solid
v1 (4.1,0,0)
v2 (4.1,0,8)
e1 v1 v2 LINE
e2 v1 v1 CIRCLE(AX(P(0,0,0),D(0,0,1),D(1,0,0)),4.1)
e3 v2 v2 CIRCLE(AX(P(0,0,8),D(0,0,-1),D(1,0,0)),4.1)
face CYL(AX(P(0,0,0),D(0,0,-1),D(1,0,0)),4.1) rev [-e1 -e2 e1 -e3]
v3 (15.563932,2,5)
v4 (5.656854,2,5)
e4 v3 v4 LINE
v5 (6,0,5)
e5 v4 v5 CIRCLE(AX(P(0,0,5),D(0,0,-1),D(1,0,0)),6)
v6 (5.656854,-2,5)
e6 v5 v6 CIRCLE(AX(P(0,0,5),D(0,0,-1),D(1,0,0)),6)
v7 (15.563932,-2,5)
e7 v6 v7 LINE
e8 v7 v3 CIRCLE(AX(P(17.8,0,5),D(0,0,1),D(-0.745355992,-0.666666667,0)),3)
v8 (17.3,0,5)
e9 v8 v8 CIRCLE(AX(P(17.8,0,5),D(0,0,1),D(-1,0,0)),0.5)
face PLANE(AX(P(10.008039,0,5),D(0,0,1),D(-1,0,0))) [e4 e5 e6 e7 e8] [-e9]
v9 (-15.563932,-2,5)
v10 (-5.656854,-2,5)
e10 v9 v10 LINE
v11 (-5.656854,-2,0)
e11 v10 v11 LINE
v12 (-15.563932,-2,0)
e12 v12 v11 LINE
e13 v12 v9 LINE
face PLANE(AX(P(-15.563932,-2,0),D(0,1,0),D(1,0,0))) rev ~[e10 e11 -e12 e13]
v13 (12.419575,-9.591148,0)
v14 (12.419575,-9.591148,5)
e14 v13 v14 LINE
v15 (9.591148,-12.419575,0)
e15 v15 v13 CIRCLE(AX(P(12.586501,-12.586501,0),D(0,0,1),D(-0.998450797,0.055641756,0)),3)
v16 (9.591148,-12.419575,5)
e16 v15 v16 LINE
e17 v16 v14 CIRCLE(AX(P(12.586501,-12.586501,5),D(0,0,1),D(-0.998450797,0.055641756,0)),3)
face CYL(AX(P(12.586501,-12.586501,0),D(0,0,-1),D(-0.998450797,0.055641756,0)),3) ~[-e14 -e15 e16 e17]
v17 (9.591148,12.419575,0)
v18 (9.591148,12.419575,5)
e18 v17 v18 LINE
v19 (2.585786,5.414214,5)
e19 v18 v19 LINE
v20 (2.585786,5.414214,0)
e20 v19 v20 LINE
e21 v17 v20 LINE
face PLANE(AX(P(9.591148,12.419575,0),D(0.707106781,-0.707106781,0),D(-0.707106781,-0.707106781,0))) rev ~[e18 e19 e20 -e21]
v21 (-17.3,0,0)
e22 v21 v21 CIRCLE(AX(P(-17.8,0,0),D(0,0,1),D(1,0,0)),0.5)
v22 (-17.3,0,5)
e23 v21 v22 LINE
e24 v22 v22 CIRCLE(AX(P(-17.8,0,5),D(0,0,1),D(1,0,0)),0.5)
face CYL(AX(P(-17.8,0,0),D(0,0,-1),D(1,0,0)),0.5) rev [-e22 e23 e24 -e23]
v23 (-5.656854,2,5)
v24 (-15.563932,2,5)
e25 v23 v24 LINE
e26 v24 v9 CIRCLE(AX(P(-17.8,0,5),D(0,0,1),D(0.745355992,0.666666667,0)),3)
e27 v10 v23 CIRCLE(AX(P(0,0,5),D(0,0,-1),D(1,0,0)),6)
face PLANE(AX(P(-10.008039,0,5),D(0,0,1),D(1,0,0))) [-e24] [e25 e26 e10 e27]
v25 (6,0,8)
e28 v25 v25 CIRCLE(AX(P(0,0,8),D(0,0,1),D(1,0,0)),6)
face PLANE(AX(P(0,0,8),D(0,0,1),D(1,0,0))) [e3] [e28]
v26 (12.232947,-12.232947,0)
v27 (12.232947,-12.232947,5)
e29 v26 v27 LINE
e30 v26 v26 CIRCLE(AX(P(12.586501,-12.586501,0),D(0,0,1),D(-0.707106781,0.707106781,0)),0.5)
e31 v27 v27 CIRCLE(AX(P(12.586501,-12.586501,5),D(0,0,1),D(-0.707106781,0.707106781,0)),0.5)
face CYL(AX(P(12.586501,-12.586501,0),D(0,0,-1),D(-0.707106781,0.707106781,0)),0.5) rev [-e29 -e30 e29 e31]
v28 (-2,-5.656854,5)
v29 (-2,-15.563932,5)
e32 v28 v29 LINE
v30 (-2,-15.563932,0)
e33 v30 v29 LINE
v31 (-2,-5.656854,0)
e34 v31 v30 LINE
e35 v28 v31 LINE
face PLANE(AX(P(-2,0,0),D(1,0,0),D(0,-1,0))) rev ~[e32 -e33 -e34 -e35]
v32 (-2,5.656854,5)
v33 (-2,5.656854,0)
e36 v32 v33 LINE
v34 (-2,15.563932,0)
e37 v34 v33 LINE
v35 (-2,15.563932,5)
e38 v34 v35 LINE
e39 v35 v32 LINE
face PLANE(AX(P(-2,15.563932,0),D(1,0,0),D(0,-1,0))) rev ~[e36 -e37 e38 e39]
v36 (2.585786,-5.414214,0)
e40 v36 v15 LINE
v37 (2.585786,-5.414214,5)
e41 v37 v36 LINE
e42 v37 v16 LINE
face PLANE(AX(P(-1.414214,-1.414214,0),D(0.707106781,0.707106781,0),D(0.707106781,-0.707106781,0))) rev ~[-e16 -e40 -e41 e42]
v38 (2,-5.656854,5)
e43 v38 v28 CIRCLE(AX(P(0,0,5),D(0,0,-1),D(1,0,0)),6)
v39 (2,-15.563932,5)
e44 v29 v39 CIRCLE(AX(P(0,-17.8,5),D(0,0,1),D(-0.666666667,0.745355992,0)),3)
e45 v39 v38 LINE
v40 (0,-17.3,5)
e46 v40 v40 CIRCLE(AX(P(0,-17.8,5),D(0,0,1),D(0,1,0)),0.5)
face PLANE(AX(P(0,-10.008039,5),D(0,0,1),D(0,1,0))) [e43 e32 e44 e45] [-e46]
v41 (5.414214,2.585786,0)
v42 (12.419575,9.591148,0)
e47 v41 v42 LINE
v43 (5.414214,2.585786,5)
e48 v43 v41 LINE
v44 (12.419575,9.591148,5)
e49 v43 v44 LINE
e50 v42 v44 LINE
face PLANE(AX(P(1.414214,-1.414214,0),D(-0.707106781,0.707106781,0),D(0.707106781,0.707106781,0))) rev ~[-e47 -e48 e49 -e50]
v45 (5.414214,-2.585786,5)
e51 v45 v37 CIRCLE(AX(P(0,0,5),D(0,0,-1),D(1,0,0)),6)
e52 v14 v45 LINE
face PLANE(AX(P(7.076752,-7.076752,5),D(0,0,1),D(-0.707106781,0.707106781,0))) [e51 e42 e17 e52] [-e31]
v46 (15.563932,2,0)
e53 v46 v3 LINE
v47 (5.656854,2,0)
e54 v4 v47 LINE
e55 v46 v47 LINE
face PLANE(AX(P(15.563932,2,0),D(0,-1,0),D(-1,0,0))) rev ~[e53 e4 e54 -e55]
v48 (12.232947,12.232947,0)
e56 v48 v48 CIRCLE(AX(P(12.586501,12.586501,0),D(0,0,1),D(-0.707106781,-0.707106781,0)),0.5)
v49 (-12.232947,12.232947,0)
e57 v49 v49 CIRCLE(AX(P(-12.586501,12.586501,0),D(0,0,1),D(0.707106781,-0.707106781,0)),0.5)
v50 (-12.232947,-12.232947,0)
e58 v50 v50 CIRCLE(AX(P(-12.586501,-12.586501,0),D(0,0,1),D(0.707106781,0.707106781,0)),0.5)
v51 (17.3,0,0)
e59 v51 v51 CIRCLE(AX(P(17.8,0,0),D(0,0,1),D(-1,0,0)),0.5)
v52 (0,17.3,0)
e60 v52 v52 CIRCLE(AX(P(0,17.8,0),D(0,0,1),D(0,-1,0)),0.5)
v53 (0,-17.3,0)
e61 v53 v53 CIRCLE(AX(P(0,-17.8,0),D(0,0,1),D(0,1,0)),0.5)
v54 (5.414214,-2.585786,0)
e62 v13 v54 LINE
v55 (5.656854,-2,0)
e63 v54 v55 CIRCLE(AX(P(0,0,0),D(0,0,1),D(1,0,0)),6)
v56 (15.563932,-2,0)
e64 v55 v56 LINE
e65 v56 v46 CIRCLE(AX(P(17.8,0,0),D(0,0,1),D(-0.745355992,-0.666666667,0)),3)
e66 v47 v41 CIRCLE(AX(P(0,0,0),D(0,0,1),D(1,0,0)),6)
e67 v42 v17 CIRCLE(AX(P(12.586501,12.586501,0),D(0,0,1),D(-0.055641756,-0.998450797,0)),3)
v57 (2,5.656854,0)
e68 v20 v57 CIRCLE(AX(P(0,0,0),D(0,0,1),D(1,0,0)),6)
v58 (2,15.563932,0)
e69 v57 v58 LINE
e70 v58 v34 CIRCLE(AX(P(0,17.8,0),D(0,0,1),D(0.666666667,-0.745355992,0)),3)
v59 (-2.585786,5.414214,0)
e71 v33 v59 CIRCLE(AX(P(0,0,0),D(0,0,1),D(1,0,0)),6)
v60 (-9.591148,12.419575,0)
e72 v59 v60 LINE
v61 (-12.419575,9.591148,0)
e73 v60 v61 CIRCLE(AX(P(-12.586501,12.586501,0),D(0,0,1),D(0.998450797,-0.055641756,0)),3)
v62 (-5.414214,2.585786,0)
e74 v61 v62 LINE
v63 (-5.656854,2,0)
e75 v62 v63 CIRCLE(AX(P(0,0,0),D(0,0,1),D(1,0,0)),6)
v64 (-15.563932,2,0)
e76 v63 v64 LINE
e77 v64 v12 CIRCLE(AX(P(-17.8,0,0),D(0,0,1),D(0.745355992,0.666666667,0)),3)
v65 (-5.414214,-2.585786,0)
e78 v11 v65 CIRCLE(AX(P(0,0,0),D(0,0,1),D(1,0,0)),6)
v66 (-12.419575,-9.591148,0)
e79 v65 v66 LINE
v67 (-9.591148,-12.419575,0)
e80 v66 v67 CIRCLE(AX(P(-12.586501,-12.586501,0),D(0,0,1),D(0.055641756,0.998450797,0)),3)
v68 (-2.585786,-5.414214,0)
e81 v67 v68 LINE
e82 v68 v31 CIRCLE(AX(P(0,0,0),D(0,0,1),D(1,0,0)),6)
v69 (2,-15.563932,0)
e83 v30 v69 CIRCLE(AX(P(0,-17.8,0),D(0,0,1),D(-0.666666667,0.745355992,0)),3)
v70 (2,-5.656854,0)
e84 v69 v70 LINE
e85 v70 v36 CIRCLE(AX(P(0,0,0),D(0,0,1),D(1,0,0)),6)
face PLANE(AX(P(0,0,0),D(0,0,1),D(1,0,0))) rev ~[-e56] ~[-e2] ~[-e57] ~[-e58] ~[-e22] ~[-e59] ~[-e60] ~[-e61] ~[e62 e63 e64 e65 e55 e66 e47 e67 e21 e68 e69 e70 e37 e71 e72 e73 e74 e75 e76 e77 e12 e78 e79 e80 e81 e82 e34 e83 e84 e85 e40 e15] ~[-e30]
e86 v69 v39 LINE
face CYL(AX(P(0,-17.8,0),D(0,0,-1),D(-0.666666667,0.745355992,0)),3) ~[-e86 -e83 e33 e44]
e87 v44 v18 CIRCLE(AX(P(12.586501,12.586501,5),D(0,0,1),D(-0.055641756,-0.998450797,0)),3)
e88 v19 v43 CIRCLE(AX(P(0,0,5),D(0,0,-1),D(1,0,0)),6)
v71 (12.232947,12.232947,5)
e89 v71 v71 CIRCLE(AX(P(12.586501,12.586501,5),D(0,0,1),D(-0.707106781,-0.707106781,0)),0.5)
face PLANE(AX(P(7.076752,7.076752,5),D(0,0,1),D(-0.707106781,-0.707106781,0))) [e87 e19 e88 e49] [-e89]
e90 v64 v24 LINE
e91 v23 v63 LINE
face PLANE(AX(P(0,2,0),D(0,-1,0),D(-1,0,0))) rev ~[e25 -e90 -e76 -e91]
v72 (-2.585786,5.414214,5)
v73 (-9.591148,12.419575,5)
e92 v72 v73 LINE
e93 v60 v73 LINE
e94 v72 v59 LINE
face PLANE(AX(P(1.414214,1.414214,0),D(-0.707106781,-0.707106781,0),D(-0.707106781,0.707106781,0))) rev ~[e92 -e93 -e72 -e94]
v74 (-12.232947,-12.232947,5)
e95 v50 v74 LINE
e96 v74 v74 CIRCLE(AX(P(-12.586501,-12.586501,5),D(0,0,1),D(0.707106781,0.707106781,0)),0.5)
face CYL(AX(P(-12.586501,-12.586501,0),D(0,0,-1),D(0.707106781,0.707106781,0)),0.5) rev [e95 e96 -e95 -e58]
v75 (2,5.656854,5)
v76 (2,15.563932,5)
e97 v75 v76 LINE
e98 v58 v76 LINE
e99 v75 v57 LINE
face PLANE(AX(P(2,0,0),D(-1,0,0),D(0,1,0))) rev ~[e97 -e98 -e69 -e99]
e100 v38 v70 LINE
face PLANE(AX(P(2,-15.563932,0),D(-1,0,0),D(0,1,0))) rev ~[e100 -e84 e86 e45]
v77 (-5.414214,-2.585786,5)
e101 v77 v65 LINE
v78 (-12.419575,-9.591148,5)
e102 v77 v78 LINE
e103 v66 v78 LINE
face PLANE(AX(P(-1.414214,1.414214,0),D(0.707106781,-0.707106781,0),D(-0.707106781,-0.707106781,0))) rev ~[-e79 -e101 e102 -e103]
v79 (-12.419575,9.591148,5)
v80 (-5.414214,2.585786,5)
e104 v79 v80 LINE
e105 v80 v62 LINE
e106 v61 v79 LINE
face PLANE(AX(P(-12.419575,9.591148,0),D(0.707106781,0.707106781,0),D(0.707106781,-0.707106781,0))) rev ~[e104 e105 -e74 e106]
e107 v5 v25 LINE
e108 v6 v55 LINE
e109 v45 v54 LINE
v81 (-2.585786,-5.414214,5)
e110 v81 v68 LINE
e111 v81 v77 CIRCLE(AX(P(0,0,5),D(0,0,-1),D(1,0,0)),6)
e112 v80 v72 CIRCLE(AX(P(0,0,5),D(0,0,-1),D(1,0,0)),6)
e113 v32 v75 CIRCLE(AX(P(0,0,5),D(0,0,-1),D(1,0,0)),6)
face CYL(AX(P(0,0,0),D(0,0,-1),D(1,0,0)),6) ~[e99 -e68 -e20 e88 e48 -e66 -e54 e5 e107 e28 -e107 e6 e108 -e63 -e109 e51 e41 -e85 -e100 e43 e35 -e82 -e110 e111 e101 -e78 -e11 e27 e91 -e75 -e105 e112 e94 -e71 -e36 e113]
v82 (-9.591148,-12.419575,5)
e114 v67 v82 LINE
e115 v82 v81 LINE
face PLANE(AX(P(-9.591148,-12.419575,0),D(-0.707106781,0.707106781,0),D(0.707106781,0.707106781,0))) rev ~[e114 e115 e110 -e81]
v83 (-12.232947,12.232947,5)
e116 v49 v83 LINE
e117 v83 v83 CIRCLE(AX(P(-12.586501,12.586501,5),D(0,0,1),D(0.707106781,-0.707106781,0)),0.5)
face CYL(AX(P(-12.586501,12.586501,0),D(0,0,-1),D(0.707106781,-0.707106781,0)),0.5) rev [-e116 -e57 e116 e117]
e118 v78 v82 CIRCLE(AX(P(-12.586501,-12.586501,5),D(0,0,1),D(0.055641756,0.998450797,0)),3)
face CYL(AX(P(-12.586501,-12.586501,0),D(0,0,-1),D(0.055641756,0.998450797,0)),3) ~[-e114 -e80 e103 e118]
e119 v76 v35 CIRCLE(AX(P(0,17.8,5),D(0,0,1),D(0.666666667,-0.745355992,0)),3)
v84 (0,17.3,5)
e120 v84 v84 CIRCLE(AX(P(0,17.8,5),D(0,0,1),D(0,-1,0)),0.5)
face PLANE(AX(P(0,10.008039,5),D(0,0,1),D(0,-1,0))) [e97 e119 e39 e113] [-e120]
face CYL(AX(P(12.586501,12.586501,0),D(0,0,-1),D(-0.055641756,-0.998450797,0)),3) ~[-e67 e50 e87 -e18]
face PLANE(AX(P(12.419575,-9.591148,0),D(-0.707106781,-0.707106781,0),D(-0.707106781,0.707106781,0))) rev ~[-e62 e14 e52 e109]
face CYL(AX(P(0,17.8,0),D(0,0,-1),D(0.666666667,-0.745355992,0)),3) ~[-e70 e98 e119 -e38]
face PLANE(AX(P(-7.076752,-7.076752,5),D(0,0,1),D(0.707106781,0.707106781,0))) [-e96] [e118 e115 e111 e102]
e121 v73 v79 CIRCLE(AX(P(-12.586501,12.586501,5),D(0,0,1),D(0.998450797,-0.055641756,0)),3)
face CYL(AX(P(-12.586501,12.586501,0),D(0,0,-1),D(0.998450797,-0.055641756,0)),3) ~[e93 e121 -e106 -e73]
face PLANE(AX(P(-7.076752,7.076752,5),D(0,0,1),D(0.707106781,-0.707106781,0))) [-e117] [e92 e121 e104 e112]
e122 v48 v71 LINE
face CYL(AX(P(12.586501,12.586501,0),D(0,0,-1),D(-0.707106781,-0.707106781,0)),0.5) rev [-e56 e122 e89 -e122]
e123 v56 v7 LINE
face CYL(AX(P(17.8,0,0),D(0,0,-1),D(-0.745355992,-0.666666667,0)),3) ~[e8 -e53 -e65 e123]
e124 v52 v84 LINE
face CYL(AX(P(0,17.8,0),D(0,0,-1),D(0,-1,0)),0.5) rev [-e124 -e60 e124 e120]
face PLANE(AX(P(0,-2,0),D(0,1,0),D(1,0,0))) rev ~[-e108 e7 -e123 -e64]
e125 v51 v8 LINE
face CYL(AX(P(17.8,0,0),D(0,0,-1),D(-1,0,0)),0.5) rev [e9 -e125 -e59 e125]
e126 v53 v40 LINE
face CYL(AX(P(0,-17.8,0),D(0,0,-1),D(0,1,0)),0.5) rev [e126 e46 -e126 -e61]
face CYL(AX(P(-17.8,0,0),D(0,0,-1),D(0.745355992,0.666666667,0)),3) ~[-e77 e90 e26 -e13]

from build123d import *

# Parameters (mm, degrees)
F1_R            = 6
F2_DEPTH        = 8
F0_R            = 0.5
F3_DEPTH        = 5
F3_COPIES_COUNT = 8
F4_R            = 4.1
F5_DEPTH        = 8.001


# Not quite as in the source:
# - a pattern or mirror of a feature is missing from the dataset's text; its kind, count and spacing are read off the source's solid


with BuildPart() as f2:
    # F1 (on Top) → F2 (new body)
    with BuildSketch(Plane.XY):
        Circle(F1_R)
    extrude(amount=F2_DEPTH)

    # F0 (on Top) → F3 (join)
    with BuildSketch(Plane.XY):
        with BuildLine():
            Line((0, 2), (-15.5639320225, 2))
            ThreePointArc((-15.5639320225, 2), (-20.8, 0), (-15.5639320225, -2))
            Line((-15.5639320225, -2), (0, -2))
            Line((0, -2), (0, 2))
        make_face()
        with Locations((-17.8, 0)):
            Circle(F0_R, mode=Mode.SUBTRACT)
    f3 = extrude(amount=F3_DEPTH)

    # F3_copies: F3 ×8 about axis
    f3_copies_axis = Axis((0, 0, 0), (0, 0, 1))
    for i in range(1, F3_COPIES_COUNT):
        add(f3.rotate(f3_copies_axis, i * 360 / F3_COPIES_COUNT))

    # F4 (on Top) → F5 (cut, through all)
    with BuildSketch(Plane.XY):
        Circle(F4_R)
    extrude(amount=F5_DEPTH, mode=Mode.SUBTRACT)


solid = f2.part
